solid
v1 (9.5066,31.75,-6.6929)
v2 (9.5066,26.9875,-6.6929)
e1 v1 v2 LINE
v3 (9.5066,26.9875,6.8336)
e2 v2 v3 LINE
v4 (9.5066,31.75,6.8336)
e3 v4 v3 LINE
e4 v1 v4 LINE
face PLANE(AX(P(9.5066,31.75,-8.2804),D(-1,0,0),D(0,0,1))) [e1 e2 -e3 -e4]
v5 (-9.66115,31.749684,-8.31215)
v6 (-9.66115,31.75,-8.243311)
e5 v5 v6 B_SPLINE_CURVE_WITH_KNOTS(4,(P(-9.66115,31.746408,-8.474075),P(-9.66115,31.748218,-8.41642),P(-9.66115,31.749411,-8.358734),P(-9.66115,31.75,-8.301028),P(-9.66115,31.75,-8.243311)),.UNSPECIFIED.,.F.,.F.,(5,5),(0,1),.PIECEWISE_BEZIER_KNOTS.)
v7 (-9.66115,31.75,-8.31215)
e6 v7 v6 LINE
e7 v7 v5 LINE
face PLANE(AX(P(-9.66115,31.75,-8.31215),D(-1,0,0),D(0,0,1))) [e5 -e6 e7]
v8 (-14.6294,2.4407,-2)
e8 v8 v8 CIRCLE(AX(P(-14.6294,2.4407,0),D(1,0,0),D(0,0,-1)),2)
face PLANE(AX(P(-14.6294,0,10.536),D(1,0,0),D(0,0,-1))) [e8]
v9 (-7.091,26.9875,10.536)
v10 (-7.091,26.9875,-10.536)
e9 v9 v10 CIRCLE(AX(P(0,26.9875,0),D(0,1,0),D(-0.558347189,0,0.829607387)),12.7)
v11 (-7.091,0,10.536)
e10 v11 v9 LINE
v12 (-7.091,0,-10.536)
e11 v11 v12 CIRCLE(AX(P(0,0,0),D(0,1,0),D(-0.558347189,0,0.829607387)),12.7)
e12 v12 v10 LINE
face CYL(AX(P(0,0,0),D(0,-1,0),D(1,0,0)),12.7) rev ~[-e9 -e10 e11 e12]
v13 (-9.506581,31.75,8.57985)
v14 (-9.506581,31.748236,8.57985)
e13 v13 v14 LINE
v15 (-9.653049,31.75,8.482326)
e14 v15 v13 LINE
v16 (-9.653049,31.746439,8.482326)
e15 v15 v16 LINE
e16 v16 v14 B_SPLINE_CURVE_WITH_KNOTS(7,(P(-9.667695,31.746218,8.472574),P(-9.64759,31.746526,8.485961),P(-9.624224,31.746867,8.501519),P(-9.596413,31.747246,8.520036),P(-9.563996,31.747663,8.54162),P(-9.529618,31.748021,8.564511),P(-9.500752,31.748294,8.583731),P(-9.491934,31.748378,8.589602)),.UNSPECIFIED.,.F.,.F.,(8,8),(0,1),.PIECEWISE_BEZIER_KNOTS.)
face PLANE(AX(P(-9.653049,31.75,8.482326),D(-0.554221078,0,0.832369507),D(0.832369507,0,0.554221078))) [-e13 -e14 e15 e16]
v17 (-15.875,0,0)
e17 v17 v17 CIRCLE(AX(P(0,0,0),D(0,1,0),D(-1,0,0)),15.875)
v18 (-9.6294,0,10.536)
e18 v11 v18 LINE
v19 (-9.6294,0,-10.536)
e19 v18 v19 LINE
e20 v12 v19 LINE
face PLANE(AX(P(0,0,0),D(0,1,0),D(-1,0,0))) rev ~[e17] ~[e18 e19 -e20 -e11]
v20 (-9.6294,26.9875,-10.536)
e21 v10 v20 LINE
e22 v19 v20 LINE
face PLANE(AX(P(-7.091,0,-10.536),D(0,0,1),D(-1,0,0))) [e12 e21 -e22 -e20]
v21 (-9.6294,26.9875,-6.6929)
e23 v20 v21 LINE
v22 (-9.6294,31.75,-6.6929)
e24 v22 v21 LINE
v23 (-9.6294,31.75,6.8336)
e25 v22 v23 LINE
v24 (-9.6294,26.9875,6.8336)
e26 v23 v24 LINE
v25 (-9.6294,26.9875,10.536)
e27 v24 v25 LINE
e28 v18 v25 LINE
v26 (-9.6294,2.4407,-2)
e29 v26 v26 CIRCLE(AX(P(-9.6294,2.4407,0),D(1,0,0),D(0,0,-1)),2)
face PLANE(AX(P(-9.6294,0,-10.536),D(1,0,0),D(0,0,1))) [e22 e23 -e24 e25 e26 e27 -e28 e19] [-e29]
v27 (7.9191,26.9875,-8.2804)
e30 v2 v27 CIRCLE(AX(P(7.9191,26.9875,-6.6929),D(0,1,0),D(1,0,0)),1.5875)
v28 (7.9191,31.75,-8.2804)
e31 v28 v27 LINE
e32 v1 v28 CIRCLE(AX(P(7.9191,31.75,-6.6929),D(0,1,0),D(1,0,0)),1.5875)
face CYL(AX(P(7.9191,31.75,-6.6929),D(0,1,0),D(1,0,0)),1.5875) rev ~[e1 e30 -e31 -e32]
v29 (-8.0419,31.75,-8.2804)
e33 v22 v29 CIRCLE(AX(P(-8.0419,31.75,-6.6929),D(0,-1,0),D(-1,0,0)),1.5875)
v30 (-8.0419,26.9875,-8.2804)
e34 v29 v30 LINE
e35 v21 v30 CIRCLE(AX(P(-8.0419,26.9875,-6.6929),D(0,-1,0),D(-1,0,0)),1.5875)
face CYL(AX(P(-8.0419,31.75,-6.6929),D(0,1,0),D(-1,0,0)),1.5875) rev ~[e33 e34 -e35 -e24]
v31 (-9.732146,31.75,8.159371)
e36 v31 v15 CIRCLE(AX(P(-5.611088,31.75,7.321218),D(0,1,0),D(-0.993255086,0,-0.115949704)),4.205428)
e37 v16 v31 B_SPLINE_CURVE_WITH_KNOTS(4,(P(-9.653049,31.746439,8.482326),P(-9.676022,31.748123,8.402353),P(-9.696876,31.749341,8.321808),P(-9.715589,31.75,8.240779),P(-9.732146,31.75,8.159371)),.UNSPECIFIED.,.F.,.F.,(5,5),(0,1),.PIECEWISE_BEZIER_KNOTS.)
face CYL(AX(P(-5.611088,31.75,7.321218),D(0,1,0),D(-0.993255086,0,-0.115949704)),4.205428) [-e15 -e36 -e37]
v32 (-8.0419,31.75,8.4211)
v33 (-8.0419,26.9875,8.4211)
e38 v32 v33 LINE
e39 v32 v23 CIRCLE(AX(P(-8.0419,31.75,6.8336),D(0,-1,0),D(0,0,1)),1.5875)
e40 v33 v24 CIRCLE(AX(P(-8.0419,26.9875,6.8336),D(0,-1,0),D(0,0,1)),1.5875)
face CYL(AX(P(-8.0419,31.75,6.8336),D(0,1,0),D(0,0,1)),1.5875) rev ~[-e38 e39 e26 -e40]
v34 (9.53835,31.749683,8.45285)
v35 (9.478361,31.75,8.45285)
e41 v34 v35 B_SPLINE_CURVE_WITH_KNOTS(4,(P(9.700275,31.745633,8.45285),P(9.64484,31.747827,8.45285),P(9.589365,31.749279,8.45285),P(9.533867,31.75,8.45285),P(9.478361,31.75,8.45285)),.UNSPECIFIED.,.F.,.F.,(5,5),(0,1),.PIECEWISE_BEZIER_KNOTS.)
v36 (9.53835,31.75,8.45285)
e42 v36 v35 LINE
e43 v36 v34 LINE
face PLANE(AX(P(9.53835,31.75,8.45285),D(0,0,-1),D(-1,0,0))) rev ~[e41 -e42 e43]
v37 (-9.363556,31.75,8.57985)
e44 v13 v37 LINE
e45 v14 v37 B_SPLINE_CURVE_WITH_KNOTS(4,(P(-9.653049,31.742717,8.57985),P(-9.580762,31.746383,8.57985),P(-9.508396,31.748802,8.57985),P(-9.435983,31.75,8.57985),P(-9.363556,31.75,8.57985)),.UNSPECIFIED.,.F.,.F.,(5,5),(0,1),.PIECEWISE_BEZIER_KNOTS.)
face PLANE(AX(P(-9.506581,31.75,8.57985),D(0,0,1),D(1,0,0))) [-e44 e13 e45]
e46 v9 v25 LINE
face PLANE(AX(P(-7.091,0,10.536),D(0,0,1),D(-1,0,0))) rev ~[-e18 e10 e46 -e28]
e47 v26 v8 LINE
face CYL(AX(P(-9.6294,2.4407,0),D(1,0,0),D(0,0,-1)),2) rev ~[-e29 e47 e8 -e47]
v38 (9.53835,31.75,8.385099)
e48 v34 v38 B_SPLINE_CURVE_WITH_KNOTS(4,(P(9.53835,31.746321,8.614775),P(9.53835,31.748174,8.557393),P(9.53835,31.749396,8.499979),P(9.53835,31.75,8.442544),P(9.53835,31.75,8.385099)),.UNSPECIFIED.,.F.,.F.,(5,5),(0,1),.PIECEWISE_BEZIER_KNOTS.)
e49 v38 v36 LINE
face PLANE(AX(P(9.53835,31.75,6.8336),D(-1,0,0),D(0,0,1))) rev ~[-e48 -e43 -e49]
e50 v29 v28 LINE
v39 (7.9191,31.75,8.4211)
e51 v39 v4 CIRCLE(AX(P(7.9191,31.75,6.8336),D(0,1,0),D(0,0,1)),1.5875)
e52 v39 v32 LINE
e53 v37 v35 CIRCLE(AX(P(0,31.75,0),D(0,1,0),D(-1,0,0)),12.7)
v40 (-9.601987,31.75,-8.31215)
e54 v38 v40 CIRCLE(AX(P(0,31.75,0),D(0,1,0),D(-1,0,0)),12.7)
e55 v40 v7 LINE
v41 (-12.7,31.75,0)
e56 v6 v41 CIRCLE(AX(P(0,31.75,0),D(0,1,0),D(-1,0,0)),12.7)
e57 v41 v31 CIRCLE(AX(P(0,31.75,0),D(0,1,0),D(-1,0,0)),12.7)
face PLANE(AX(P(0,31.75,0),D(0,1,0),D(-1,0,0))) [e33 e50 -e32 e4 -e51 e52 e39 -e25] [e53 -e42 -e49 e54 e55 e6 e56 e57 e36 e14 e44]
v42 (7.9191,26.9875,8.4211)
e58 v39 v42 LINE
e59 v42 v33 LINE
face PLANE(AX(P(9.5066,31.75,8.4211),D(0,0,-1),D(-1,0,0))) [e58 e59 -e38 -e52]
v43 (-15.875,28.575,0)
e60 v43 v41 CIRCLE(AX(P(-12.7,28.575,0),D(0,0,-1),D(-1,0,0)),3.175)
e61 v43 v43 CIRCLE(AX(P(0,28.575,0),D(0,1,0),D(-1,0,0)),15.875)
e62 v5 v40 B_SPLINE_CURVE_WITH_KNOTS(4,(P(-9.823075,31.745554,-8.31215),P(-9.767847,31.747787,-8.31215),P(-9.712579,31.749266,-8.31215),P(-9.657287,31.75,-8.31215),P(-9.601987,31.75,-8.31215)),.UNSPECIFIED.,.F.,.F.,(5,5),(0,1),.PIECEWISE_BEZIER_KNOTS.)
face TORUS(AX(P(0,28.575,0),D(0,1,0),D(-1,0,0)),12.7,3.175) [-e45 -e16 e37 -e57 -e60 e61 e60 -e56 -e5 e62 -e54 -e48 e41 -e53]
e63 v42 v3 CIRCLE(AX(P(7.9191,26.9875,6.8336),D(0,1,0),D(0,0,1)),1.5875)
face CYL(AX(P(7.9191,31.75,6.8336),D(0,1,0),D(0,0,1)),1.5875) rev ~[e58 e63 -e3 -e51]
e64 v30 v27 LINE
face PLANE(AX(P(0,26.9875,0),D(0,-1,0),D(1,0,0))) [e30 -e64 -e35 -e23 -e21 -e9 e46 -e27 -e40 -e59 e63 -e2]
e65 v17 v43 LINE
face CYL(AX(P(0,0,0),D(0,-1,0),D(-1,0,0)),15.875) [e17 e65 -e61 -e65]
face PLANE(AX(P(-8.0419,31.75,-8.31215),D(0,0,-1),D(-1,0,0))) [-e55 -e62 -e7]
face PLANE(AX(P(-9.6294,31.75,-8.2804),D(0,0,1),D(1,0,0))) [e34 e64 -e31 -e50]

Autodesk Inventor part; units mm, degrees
ref_plane "YZ Plane" through (0, 0, 0) normal (1, 0, 0) x (0, 1, 0)
ref_plane "XZ Plane" through (0, 0, 0) normal (0, 1, 0) x (-1, 0, 0)
ref_plane "XY Plane" through (0, 0, 0) normal (0, 0, 1) x (1, 0, 0)
sketch "Sketch1" plane through (0, 0, 0) normal (0, 1, 0) x (-1, 0, 0)
  circle A0 centre (0, 0) radius 15.875
  dimension "d0" = 31.75
extrude "Extrusion1" add sketch "Sketch1" along normal blind 31.75
fillet "Fillet1" radius 3.175 1 edges at (15.875, 31.75, 0)
sketch "Sketch2" plane through (0, 31.75, 0) normal (0, 1, 0) x (1, 0, 0)
  point P0 (0, 0)
sketch "Sketch3" plane through (0, 0, 0) normal (0, -1, 0) x (1, 0, 0)
  circle A0 centre (0, 0) radius 12.7
  line L0 (-7.091, -10.536) -> (-9.6294, -10.536)
  line L1 (-9.6294, -10.536) -> (-9.6294, 8.2804)
  line L2 (-9.6294, 8.2804) -> (-7.091, 8.2804)
  line L3 (-7.091, 8.2804) -> (-7.091, -10.536)
  line L4 (-7.091, 10.536) -> (-9.6294, 10.536)
  line L5 (-9.6294, 10.536) -> (-9.6294, 8.2804)
  line L6 (-9.6294, 8.2804) -> (-7.091, 8.2804)
  line L7 (-7.091, 8.2804) -> (-7.091, 10.536)
extrude "Extrusion2" cut sketch "Sketch3" against normal blind 26.9875 contours A0 L3 L7 | L7 L2 A0 | A0 L5 L4 | L0 L1 A0 | A0 L1 L2 L3
sketch "Sketch4" plane through (0, 31.75, 0) normal (0, 1, 0) x (1, 0, 0)
  circle A0 centre (0, 0) radius 12.7
  line L0 (-9.6294, 10.536) -> (-9.6294, -10.536) projected
  line L1 (-9.6294, 8.2804) -> (9.5066, 8.2804)
  line L2 (9.5066, 8.2804) -> (9.5066, -8.4211)
  line L3 (9.5066, -8.4211) -> (-9.6294, -8.4211)
  line L4 (-9.6294, -8.4211) -> (-9.6294, 8.2804)
  point P0 (-9.5066, -8.4211)
  point P1 (-9.6294, -8.2804)
extrude "Extrusion3" cut sketch "Sketch4" against normal blind 4.7625 contours L1 L2 L3 A0 L0
fillet "Fillet2" radius 1.5875 5 edges at (-9.6294, 29.3687, -8.2804) (9.5066, 29.3687, -8.2804) (9.5066, 29.3687, 8.4211) (-9.6294, 29.3687, 8.2804) (-9.5066, 29.3687, 8.4211)
sketch "Sketch5" plane through (-9.6294, 0, 10.536) normal (1, 0, 0) x (0, 0, -1)
  circle A0 centre (10.536, 2.4407) radius 2
  point P0 (10.536, 0)
  dimension "d9" = 4
extrude "Extrusion4" cut sketch "Sketch5" against normal blind 5
properties part number "module"
